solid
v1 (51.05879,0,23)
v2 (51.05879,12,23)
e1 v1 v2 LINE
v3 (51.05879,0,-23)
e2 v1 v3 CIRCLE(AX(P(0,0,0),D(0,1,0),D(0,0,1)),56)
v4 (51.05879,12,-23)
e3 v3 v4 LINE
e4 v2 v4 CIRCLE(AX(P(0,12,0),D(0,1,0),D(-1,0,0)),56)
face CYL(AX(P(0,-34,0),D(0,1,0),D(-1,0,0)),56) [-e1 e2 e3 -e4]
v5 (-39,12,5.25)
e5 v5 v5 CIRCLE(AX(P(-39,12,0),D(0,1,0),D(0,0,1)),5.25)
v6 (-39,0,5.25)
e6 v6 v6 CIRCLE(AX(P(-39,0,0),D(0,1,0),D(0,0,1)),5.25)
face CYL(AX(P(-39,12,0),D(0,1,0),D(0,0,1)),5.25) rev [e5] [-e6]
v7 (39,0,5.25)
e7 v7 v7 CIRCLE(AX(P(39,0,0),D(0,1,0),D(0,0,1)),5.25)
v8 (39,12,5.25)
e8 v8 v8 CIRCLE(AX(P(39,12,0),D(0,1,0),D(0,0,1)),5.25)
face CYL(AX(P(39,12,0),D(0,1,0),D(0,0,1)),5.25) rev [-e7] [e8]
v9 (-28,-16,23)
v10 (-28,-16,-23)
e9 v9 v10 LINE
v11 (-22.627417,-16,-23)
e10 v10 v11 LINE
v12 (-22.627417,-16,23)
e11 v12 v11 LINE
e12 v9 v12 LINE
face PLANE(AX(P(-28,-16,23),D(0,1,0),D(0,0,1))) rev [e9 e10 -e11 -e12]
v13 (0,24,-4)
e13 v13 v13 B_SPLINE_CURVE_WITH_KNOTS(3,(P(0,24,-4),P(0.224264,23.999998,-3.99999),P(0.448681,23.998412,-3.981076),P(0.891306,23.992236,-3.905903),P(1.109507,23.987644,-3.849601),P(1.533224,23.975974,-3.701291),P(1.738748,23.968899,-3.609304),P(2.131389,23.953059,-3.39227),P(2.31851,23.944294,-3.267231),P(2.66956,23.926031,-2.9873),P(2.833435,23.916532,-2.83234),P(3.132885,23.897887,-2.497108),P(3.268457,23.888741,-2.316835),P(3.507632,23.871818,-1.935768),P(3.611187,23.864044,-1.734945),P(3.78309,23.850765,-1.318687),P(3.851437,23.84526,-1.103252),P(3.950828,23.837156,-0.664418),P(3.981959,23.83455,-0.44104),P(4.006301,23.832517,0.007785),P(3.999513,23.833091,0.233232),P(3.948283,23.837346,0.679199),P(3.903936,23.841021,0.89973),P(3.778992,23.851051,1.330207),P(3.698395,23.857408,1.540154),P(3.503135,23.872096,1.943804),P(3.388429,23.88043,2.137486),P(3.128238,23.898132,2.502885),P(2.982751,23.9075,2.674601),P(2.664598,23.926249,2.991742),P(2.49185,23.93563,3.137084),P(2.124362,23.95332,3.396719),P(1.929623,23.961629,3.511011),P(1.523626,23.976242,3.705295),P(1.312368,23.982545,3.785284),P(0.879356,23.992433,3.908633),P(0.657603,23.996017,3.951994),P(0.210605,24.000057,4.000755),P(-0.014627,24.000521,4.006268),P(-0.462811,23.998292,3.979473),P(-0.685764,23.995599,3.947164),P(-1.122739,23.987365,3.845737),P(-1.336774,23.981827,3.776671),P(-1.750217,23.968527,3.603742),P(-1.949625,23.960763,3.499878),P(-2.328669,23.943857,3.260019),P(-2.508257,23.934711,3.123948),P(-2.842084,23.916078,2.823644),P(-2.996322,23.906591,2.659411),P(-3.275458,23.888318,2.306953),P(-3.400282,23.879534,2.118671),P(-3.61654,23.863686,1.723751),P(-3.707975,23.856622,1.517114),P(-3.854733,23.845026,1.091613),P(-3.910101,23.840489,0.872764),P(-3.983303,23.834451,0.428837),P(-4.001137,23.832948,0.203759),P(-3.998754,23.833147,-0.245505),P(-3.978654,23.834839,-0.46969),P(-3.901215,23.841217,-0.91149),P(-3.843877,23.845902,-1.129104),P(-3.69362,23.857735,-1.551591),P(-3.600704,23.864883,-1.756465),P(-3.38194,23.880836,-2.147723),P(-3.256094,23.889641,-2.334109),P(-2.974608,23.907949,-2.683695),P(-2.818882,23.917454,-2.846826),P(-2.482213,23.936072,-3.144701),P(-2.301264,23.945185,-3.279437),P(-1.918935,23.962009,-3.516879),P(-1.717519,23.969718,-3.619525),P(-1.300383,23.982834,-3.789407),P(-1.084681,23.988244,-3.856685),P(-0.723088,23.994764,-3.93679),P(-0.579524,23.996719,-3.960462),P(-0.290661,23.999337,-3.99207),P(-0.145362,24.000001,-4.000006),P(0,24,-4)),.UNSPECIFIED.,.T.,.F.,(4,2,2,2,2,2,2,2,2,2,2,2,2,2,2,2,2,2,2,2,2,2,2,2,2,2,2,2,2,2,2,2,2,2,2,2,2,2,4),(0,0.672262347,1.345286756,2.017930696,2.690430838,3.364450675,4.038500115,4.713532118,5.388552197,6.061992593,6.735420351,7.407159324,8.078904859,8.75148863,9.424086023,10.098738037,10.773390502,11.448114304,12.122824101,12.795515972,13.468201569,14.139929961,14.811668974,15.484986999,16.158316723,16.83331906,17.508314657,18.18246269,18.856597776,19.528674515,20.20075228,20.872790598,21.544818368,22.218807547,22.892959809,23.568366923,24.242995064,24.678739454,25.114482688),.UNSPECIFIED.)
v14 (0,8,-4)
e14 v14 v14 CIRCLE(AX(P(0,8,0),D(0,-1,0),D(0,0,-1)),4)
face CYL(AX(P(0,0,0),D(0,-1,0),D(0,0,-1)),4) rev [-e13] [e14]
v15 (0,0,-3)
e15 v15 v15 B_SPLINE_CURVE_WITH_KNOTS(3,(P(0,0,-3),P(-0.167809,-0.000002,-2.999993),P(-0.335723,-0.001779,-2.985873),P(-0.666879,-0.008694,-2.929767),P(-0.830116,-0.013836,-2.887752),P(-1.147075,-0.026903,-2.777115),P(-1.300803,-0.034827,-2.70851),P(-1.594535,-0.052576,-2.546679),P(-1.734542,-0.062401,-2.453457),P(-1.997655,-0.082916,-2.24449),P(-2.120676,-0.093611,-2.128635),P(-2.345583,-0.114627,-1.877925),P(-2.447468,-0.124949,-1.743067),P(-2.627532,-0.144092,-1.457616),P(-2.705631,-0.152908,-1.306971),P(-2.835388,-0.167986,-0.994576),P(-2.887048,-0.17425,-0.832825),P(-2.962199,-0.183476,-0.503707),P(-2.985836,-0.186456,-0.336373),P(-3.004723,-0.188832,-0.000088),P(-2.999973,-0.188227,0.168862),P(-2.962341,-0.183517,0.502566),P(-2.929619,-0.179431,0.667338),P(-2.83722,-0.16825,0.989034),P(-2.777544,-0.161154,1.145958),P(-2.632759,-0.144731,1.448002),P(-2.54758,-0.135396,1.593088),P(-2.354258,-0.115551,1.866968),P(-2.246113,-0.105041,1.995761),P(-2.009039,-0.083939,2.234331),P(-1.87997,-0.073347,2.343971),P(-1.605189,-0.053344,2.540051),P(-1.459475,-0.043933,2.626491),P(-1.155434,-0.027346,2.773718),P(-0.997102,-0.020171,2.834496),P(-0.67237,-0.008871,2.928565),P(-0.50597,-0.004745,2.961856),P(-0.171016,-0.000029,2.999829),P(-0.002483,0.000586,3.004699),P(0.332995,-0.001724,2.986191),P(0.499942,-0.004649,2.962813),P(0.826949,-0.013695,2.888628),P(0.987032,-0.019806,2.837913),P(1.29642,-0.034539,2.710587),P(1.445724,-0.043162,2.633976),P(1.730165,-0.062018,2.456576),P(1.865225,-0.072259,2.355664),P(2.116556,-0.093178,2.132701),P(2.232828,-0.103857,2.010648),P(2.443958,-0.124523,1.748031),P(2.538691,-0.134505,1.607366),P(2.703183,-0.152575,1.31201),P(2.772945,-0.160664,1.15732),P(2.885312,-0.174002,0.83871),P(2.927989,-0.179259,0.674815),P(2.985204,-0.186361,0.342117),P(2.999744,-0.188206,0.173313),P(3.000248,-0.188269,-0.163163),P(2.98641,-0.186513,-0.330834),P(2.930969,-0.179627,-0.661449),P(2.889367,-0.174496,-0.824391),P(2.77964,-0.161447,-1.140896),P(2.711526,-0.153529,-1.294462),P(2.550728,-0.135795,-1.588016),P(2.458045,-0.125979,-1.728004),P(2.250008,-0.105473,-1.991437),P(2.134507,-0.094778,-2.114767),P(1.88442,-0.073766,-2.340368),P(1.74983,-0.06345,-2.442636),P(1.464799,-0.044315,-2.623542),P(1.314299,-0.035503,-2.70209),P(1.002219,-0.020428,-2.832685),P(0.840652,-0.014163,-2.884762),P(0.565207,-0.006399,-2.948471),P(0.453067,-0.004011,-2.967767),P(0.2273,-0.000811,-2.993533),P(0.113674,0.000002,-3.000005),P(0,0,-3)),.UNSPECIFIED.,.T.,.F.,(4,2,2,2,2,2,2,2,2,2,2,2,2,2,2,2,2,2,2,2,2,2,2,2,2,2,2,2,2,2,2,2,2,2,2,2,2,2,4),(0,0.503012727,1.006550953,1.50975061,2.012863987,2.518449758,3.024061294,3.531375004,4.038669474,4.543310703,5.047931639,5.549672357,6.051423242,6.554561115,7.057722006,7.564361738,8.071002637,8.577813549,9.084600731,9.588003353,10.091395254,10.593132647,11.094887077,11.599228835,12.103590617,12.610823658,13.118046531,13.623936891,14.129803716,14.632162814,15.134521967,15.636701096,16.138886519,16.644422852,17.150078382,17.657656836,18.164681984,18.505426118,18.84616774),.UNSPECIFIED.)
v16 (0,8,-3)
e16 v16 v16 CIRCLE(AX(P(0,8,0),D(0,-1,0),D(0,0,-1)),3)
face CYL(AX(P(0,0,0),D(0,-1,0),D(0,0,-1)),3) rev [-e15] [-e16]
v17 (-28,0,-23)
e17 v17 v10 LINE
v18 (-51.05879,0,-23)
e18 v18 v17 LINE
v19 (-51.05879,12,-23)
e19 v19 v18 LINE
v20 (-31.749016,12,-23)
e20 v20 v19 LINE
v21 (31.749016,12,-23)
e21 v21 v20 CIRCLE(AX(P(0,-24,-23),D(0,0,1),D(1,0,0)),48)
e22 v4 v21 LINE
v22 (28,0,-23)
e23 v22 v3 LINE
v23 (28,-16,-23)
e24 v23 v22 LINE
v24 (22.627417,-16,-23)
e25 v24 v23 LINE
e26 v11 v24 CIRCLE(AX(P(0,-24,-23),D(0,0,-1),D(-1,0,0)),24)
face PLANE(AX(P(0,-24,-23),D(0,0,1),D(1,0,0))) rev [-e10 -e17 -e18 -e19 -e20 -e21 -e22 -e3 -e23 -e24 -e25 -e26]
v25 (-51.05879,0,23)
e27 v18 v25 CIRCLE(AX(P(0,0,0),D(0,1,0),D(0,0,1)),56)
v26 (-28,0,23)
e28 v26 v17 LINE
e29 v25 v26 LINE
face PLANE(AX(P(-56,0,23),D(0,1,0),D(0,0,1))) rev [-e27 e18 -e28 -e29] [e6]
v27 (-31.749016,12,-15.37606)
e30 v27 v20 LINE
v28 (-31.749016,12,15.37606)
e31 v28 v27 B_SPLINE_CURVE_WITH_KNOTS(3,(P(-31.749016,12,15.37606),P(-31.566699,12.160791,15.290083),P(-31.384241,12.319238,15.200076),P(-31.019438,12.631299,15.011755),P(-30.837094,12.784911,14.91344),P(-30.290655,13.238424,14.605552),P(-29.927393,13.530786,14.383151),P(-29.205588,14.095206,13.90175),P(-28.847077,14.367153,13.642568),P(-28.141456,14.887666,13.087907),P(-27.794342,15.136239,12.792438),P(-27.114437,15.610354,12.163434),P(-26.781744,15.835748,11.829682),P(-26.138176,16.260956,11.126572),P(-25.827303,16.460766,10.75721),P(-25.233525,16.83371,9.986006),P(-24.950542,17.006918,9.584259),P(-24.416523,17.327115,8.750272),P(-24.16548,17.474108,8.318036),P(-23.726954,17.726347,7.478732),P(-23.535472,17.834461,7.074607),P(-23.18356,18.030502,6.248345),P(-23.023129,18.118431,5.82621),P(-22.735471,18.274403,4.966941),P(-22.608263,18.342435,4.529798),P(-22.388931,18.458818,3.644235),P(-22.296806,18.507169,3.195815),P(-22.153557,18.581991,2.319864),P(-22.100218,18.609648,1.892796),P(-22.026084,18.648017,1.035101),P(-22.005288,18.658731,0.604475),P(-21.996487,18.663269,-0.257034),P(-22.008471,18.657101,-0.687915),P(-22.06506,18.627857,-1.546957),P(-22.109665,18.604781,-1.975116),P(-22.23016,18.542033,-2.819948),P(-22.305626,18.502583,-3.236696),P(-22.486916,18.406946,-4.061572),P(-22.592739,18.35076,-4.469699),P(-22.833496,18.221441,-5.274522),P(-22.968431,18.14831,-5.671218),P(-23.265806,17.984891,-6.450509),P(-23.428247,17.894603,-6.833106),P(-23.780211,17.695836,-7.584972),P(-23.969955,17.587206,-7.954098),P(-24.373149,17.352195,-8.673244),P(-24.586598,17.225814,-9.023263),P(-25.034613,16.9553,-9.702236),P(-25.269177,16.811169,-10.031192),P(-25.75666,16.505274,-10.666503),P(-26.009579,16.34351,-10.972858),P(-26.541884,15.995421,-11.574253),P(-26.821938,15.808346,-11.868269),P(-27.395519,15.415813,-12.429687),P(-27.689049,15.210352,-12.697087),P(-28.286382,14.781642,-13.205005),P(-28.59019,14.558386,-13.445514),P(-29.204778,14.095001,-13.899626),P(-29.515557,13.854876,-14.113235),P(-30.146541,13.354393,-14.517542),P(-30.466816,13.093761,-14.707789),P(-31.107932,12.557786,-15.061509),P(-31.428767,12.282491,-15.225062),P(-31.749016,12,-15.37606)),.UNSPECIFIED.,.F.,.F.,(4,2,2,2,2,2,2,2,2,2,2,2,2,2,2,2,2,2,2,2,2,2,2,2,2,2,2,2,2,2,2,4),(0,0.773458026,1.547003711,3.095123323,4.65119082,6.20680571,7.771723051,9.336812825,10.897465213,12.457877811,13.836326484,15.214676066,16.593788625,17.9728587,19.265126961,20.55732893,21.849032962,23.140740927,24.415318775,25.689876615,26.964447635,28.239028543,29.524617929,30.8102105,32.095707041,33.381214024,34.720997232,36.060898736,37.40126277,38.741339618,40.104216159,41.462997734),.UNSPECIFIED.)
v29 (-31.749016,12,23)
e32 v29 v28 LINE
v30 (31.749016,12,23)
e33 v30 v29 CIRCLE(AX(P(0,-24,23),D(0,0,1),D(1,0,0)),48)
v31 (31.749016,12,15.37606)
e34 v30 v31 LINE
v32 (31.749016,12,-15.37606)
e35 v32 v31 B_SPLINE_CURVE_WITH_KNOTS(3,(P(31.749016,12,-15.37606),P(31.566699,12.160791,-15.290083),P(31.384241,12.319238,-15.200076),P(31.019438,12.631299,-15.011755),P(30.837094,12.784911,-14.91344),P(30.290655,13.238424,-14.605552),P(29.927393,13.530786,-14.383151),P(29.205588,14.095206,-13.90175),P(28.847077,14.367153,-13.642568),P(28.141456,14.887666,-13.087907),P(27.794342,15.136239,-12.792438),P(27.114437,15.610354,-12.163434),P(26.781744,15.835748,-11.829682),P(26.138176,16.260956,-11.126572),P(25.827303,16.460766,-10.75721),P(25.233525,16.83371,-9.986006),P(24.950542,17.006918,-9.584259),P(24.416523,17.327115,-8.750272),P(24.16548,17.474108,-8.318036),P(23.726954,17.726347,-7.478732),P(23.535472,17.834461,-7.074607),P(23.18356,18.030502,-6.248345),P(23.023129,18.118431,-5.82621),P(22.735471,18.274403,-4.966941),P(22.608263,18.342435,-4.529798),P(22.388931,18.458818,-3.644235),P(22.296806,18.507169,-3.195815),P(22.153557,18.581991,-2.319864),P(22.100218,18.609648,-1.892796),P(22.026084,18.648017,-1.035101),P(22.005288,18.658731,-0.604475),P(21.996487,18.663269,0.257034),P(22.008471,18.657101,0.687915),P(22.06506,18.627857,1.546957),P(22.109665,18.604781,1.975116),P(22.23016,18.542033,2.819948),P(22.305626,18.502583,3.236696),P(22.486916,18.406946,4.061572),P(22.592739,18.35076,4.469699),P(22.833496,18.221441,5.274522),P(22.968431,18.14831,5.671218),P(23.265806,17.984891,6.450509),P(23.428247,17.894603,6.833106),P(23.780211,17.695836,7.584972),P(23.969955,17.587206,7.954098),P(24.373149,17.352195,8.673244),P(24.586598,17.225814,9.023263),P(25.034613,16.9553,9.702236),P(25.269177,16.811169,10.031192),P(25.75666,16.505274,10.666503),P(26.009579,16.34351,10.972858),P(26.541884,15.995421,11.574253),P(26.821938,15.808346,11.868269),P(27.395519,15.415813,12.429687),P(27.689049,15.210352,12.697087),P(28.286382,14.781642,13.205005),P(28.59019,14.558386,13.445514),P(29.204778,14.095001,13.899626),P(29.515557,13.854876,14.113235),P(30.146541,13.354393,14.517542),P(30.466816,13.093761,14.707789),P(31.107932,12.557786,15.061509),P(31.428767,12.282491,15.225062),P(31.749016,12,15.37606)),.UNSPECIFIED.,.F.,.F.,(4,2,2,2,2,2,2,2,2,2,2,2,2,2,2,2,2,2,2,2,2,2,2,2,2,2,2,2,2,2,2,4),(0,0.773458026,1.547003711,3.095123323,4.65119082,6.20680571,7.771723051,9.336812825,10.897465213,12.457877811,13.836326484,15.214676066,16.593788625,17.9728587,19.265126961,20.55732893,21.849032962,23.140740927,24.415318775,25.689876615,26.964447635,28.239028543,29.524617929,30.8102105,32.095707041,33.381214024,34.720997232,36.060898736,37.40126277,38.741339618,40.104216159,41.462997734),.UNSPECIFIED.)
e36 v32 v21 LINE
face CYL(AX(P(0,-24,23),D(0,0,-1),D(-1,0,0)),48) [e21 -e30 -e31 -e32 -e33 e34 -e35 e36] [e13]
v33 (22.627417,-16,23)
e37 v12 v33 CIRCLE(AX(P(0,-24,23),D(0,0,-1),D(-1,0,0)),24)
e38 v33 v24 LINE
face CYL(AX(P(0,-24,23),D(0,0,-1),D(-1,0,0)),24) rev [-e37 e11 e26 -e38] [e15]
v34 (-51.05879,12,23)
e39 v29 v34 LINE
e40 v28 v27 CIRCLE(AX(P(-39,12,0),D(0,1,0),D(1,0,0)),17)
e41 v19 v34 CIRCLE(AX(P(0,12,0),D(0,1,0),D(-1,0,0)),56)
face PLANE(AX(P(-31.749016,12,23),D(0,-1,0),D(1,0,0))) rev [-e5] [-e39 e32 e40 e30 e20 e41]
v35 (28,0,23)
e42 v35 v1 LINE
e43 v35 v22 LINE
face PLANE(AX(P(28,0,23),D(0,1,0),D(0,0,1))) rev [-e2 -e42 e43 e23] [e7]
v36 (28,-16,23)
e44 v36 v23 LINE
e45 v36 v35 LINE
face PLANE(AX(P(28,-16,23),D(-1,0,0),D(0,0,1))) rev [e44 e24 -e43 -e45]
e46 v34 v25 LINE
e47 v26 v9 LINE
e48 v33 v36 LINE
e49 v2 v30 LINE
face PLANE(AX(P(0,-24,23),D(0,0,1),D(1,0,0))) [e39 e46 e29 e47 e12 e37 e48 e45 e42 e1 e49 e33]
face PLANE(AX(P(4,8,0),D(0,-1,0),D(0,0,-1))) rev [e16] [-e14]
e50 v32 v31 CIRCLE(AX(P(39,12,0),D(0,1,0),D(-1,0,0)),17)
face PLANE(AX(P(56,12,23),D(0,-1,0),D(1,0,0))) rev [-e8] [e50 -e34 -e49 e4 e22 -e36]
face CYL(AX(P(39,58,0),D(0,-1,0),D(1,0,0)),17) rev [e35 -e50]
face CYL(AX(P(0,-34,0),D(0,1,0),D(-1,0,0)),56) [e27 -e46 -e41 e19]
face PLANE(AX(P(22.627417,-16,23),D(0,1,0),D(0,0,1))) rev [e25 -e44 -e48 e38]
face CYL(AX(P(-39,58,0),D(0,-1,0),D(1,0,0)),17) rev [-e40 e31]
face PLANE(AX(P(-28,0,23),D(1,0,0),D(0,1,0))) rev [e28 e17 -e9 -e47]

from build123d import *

# Parameters (mm, degrees)
BOSS_EXTRUDE1_DEPTH    = 23
CUT_EXTRUDE1_START     = -12
CUT_EXTRUDE1_DEPTH     = 12
SKETCH4_R              = 17
CUT_EXTRUDE2_DEPTH     = 46
M12X1_5_TAPPED_HOLE1_D = 10.5


# Read off the part's stored shape, not the designer's step: Cut-Extrude1
with BuildPart() as part:
    # Sketch1 → Boss-Extrude1 (new, symmetric)
    with BuildSketch(Plane.XY):
        with BuildLine():
            Line((56, 0), (56, 12))
            Line((56, 12), (31.749015733, 12))
            ThreePointArc((31.749015733, 12), (0, 24), (-31.749015733, 12))
            Line((-31.749015733, 12), (-56, 12))
            Line((-56, 12), (-56, 0))
            Line((-56, 0), (-28, 0))
            Line((-28, 0), (-28, -16))
            Line((-28, -16), (-22.627416998, -16))
            ThreePointArc((-22.627416998, -16), (0, 0), (22.627416998, -16))
            Line((22.627416998, -16), (28, -16))
            Line((28, -16), (28, 0))
            Line((28, 0), (56, 0))
        make_face()
    extrude(amount=BOSS_EXTRUDE1_DEPTH, both=True)

    # Cut-Extrude1 outline → Cut-Extrude1 (cut)
    with BuildSketch(Plane(origin=(0, 12, 0), x_dir=(1, 0, 0), z_dir=(0, 1, 0)).offset(CUT_EXTRUDE1_START)):
        with BuildLine():
            ThreePointArc((-56, 0), (-54.750763557, 11.762393036), (-51.058789645, 23))
            Line((-51.058789645, 23), (-56, 23))
            Line((-56, 23), (-56, 0))
        make_face()
        with BuildLine():
            ThreePointArc((-51.058789645, -23), (-54.750763557, -11.762393036), (-56, 0))
            Line((-56, 0), (-56, -23))
            Line((-56, -23), (-51.058789645, -23))
        make_face()
        with BuildLine():
            Line((56, 23), (51.058789645, 23))
            ThreePointArc((51.058789645, 23), (54.750763557, 11.762393036), (56, 0))
            Line((56, 0), (56, 23))
        make_face()
        with BuildLine():
            Line((56, -23), (56, 0))
            ThreePointArc((56, 0), (54.750763557, -11.762393036), (51.058789645, -23))
            Line((51.058789645, -23), (56, -23))
        make_face()
    extrude(amount=CUT_EXTRUDE1_DEPTH, mode=Mode.SUBTRACT)

    # Sketch4 → Cut-Extrude2 (cut)
    with BuildSketch(Plane(origin=(0, 12, 0), x_dir=(1, 0, 0), z_dir=(0, 1, 0))):
        with Locations((39, 0)):
            Circle(SKETCH4_R)
        with Locations((-39, 0)):
            Circle(SKETCH4_R)
    extrude(amount=CUT_EXTRUDE2_DEPTH, mode=Mode.SUBTRACT)

    # M12x1.5 Tapped Hole1 (through all)
    with Locations(Plane(origin=(39, 12, 0), x_dir=(1, 0, 0), z_dir=(0, 1, 0))):
        with Locations((0, 0)):
            m12x1_5_tapped_hole1 = Hole(M12X1_5_TAPPED_HOLE1_D / 2)

    # Mirror1: M12x1.5 Tapped Hole1 across plane
    add(m12x1_5_tapped_hole1.mirror(Plane(origin=(0, 0, 0), x_dir=(0, 0, 1), z_dir=(1, 0, 0))), mode=Mode.SUBTRACT)

    # Sketch7 → Cut-Revolve4 (revolve, cut)
    with BuildSketch(Plane.XY, mode=Mode.PRIVATE) as cut_revolve4_sk:
        Polygon((0, 24), (4, 24), (4, 8), (3, 8), (3, -2.439893383), (0, -2.439893383), align=None)
    revolve(cut_revolve4_sk.sketch.rotate(Axis((0, 0, 0), (0, 1, 0)), 90), axis=Axis((0, 0, 0), (0, 1, 0)), mode=Mode.SUBTRACT)


solid = part.part
